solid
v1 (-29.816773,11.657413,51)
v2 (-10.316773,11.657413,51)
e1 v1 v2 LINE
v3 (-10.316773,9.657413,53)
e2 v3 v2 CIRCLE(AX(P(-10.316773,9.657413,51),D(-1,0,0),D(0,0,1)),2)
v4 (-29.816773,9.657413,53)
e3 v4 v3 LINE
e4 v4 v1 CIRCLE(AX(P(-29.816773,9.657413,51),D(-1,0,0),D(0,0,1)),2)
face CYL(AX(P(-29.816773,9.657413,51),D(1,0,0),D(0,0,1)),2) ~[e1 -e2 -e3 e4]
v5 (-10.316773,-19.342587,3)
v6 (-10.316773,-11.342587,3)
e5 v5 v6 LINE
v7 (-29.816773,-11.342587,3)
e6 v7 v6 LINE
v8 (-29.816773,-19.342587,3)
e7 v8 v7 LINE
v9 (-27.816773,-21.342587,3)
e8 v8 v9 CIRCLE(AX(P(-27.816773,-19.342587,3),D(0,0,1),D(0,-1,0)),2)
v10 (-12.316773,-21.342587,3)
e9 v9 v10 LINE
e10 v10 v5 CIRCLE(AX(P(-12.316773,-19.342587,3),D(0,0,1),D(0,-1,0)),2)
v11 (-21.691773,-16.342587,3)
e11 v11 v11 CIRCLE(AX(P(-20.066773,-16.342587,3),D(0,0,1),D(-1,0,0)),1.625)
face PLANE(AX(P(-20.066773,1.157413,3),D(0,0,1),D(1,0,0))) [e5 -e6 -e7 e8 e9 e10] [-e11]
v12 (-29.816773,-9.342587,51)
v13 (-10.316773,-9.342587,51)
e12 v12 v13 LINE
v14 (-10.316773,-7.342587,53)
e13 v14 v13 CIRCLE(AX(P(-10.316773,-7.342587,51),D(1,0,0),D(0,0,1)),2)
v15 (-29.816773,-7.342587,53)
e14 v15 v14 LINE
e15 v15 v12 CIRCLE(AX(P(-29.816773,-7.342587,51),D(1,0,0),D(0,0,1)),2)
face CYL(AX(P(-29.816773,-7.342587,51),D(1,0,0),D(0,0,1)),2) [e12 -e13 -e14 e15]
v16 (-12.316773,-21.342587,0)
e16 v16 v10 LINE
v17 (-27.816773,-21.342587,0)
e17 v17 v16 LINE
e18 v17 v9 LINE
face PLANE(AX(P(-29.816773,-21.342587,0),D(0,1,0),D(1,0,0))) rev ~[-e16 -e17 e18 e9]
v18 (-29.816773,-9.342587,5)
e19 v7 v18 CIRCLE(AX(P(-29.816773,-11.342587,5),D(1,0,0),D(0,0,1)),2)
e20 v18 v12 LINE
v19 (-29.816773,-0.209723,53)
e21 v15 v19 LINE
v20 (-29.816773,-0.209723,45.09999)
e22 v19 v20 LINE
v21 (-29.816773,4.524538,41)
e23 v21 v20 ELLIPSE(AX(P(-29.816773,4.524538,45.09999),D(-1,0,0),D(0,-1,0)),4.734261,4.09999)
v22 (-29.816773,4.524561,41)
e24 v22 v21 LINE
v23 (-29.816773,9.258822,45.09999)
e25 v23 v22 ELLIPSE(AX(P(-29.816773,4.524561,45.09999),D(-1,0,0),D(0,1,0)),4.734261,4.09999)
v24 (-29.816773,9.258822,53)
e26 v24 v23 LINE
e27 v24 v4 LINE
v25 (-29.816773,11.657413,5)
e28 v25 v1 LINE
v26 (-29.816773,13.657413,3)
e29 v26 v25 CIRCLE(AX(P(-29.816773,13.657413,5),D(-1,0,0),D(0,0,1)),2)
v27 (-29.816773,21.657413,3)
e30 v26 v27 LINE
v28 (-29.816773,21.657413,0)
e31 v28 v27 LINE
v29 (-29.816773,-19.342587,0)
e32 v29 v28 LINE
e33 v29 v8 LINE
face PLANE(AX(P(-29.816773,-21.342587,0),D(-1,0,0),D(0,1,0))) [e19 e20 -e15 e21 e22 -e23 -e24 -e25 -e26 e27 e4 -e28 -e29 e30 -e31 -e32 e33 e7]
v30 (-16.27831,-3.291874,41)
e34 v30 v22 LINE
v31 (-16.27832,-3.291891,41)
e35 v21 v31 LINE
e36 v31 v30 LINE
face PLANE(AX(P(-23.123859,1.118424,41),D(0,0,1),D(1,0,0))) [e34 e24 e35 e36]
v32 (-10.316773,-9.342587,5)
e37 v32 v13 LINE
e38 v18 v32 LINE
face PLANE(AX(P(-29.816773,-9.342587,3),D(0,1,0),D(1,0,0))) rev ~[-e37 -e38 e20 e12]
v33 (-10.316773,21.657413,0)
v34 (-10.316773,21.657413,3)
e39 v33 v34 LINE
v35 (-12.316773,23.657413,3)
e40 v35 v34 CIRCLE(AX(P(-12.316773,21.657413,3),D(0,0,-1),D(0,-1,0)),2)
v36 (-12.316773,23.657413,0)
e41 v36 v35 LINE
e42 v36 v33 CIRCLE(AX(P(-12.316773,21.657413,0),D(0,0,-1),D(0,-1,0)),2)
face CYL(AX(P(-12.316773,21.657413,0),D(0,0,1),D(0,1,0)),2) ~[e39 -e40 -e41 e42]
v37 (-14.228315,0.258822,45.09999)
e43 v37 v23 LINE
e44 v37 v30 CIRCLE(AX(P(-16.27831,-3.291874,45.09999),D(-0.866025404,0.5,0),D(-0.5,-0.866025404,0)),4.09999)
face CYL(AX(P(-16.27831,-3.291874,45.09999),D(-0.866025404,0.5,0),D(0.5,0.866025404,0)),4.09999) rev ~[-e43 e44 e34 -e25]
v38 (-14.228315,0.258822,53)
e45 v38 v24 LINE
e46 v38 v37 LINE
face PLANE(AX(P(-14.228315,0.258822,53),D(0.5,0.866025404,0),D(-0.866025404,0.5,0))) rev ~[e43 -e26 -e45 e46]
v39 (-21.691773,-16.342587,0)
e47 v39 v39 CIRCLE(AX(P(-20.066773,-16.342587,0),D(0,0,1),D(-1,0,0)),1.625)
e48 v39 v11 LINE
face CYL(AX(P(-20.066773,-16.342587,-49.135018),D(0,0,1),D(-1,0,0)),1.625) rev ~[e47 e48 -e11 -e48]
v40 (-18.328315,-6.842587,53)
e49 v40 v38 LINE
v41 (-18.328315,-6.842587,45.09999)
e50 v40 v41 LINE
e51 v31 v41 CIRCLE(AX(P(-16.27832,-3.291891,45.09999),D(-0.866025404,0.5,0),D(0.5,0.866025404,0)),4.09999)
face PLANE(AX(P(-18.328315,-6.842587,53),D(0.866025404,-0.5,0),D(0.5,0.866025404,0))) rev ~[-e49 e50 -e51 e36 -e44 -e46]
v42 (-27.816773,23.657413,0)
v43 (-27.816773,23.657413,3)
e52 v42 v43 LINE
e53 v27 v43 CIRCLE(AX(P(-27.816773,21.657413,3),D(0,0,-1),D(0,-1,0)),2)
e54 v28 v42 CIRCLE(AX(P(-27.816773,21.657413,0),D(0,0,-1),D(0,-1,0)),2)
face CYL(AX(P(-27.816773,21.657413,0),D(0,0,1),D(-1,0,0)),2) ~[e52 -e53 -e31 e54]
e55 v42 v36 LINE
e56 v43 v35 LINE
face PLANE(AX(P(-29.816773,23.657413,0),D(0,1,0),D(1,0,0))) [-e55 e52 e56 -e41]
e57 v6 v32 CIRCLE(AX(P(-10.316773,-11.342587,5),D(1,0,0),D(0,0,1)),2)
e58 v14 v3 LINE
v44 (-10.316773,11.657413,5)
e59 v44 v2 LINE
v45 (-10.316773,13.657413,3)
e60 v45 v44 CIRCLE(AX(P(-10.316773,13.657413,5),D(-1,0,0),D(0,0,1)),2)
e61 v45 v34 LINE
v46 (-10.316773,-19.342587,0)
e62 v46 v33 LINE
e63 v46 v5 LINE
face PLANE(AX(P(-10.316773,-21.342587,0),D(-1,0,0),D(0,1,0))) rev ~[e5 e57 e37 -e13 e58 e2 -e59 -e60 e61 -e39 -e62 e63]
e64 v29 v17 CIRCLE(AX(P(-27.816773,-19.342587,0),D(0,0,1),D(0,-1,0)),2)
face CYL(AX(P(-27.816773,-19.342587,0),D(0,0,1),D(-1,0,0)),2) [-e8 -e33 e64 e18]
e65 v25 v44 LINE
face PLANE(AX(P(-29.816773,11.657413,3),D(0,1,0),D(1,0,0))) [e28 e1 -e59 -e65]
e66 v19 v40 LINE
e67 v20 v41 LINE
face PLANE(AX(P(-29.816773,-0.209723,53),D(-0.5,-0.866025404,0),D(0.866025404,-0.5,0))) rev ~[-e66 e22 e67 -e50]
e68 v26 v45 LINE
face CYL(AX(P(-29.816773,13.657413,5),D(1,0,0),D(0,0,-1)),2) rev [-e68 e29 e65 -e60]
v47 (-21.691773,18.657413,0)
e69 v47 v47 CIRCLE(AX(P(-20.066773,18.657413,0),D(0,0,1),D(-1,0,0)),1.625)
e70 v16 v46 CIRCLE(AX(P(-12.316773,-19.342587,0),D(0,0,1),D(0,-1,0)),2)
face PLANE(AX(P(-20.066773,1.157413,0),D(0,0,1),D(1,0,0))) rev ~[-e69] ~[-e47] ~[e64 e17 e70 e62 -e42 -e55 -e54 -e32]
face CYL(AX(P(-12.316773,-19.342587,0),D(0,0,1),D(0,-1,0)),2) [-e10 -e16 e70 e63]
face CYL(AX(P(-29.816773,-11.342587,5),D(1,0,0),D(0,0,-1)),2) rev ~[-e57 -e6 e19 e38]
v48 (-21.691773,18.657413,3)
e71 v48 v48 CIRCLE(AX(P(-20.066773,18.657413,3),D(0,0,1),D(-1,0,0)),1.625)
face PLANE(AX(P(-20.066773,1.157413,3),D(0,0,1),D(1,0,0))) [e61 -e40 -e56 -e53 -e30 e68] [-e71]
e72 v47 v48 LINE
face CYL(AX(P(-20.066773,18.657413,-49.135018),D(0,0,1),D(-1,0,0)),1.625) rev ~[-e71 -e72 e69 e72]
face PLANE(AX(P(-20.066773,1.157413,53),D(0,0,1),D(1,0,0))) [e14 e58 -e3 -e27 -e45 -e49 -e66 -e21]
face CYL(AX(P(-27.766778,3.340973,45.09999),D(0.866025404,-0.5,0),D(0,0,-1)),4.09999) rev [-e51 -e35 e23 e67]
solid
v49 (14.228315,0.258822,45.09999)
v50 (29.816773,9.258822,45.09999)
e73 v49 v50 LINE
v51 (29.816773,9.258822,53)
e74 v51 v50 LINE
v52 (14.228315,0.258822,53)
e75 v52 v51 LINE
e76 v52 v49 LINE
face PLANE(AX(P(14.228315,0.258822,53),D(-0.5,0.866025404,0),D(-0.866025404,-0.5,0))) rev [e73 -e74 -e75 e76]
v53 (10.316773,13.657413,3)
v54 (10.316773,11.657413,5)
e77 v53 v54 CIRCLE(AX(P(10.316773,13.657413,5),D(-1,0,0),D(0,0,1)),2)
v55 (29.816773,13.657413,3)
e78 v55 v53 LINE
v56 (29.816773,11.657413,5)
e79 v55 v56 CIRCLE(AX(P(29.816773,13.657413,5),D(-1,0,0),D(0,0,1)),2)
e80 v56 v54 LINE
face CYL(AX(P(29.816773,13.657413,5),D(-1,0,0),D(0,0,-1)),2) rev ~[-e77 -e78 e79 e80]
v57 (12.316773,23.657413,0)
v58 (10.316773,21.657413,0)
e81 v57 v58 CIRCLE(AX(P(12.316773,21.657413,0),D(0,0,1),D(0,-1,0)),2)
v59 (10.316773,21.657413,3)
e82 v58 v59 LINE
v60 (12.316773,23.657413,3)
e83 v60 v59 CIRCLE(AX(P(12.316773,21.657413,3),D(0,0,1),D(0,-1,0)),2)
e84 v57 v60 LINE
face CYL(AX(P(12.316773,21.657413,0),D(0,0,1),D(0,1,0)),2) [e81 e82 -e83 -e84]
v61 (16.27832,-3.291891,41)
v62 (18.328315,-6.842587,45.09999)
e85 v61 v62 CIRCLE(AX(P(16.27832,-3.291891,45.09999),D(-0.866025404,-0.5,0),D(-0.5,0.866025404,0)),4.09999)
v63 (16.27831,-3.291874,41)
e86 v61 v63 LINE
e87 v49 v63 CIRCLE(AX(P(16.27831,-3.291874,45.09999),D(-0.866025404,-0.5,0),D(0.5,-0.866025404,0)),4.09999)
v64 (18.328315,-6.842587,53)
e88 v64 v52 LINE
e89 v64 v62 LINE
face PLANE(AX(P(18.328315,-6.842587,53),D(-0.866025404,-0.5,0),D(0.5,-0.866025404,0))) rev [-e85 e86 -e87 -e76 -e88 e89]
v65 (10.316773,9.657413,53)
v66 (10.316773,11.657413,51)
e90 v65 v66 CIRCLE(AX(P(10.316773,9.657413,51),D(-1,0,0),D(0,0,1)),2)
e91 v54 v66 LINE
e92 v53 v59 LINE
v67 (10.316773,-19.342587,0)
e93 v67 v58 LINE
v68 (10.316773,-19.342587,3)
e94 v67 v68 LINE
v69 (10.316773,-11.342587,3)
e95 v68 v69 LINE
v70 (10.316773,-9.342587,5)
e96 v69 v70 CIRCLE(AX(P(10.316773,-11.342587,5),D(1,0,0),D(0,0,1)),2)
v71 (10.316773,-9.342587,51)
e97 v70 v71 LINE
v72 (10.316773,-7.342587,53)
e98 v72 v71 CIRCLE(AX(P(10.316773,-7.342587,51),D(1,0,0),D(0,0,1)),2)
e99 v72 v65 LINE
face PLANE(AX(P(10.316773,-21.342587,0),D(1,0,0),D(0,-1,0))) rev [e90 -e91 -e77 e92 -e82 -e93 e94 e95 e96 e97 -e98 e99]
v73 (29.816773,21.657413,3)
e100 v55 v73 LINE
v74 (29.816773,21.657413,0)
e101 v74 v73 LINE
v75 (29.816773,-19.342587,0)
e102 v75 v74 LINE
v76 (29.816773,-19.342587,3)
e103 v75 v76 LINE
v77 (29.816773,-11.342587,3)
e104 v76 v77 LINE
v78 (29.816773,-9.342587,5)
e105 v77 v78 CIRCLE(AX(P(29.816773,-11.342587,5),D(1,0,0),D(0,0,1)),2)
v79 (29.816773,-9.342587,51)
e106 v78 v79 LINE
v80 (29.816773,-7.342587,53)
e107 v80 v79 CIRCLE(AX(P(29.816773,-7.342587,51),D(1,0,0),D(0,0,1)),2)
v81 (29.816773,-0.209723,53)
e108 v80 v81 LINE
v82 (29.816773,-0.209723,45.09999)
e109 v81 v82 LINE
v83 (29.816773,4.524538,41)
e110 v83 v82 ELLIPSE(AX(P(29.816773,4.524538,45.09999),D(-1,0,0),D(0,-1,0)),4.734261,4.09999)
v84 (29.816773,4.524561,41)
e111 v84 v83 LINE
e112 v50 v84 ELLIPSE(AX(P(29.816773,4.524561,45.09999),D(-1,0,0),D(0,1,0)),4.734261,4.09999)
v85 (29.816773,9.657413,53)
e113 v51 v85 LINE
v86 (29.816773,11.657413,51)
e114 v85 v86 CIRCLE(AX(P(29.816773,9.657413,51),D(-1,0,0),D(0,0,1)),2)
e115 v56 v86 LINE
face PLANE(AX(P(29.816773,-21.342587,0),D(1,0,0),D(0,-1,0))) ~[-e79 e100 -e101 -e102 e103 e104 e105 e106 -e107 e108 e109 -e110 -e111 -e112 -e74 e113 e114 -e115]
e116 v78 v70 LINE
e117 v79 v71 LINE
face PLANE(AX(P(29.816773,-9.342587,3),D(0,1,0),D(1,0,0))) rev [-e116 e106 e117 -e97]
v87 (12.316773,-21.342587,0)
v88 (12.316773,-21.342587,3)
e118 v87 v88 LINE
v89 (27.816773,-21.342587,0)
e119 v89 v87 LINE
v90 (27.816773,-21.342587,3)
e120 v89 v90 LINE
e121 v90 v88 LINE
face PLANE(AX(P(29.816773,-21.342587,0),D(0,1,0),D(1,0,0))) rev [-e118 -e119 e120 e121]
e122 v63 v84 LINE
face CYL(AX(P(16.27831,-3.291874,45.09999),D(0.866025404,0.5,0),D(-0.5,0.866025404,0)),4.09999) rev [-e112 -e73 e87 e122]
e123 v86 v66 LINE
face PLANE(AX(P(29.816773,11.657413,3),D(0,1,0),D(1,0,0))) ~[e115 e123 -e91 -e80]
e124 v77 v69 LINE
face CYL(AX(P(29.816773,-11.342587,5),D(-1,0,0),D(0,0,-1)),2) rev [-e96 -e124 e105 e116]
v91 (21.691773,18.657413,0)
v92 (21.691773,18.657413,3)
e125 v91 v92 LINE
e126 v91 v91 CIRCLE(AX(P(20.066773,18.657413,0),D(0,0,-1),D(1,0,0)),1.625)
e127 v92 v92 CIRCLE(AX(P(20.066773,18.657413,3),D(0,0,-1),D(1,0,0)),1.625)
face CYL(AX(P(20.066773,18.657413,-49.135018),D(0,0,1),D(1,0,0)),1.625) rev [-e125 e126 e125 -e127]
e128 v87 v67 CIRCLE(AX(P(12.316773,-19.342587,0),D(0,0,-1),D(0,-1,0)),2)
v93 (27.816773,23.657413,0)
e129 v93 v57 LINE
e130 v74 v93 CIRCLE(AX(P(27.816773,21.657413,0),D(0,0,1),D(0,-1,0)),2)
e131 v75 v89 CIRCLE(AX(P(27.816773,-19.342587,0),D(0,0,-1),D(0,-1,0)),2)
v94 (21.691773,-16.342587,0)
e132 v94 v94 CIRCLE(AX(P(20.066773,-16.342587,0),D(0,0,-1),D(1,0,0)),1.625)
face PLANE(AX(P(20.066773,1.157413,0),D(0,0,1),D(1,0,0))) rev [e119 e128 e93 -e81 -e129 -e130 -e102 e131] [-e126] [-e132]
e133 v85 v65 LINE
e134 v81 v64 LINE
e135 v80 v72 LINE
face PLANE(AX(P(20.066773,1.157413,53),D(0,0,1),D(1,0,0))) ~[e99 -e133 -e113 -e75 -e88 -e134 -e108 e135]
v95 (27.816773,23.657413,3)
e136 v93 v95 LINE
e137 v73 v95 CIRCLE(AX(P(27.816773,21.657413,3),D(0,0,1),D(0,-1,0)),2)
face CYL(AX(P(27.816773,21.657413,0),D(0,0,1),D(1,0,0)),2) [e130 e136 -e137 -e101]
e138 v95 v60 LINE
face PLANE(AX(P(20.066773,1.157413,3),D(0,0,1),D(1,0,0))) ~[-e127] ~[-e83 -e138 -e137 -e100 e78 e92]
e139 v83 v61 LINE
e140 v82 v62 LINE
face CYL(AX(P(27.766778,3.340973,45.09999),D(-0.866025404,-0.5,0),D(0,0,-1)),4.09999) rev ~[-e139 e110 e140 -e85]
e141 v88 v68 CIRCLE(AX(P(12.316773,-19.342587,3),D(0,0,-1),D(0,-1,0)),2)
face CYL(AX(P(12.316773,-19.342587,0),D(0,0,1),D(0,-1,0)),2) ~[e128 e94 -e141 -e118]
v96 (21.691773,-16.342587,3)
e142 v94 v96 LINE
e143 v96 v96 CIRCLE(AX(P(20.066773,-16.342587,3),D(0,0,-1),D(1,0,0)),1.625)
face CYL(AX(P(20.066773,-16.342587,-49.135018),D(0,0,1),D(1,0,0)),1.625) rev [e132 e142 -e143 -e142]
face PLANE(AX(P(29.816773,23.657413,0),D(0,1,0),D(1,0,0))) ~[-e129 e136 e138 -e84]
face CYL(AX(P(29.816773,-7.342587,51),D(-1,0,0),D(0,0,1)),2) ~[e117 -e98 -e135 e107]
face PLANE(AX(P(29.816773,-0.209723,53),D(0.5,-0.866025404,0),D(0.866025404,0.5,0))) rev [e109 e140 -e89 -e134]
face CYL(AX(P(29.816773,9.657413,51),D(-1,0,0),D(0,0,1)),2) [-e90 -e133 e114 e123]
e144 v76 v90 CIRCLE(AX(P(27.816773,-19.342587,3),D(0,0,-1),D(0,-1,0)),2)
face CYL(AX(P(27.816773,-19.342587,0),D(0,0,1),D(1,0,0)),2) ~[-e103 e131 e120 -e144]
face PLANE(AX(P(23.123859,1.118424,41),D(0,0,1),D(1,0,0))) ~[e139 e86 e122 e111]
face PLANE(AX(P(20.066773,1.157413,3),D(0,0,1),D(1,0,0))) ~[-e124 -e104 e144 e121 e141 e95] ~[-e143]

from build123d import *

# Parameters (mm, degrees)
F0_W     = 19.5
F0_H     = 45
F1_DEPTH = 3
F2_D     = 3.25
F3_D     = 3.25
F4_W     = 19.5
F4_H     = 21
F5_DEPTH = 50
F6_R     = 2
F7_R     = 2
F9_DEPTH = 12
F10_R    = 4.09999
F11_R    = 2


# Not quite as in the source:
# - a fillet or chamfer is up to 0.001 mm smaller than in the source, because OpenCascade refuses the exact size


with BuildPart() as f1:
    # F0 (on Top) → F1 (new body)
    with BuildSketch(Plane.XY):
        with Locations((-20.0667725876, 1.1574134253)):
            Rectangle(F0_W, F0_H)
    extrude(amount=F1_DEPTH)

    # F2 (through all)
    with Locations(Plane(origin=(0, 0, 0), x_dir=(1, 0, 0), z_dir=(0, 0, -1))):
        with Locations((-20.0667725876, 16.3425865747)):
            Hole(F2_D / 2)

    # F3 (through all)
    with Locations(Plane(origin=(0, 0, 0), x_dir=(1, 0, 0), z_dir=(0, 0, -1))):
        with Locations((-20.0667725876, -18.6574134253)):
            Hole(F3_D / 2)

    # F4 (on face) → F5 (join)
    with BuildSketch(Plane.XY.offset(3)):
        with Locations((-20.0667725876, 1.1574134253)):
            Rectangle(F4_W, F4_H)
    extrude(amount=F5_DEPTH)

    # F6
    f6_edges = [f1.edges().sort_by_distance(p)[0] for p in [
        (-20.066773, -9.342587, 3),
        (-20.066773, 11.657413, 3),
    ]]
    fillet(f6_edges, radius=F6_R)

    # F7
    f7_edges = [f1.edges().sort_by_distance(p)[0] for p in [
        (-10.316773, -21.342587, 1.5),
        (-29.816773, -21.342587, 1.5),
        (-10.316773, 23.657413, 1.5),
        (-29.816773, 23.657413, 1.5),
    ]]
    fillet(f7_edges, radius=F7_R)

    # F8 (on face) → F9 (cut)
    with BuildSketch(Plane.XY.offset(53)):
        Polygon((-14.2283153195, 0.2588217364), (-29.8167725876, 9.2588217364), (-29.8167725876, -0.2097226783), (-18.3283153195, -6.8425865747), align=None)
    extrude(amount=-F9_DEPTH, mode=Mode.SUBTRACT)

    # F10 (radius 4.1 in the source; OpenCascade refuses exactly that, so slightly less here)
    f10_edges = [f1.edges().sort_by_distance(p)[0] for p in [
        (-22.022544, 4.758822, 41),
        (-24.072544, -3.526155, 41),
    ]]
    fillet(f10_edges, radius=F10_R)

    # F11
    f11_edges = [f1.edges().sort_by_distance(p)[0] for p in [
        (-20.066773, -9.342587, 53),
        (-20.066773, 11.657413, 53),
    ]]
    fillet(f11_edges, radius=F11_R)


with BuildPart() as f12_1:
    # F12: instance of F1
    add(f1.part.mirror(Plane.YZ))


solid = Compound([f1.part, f12_1.part])
